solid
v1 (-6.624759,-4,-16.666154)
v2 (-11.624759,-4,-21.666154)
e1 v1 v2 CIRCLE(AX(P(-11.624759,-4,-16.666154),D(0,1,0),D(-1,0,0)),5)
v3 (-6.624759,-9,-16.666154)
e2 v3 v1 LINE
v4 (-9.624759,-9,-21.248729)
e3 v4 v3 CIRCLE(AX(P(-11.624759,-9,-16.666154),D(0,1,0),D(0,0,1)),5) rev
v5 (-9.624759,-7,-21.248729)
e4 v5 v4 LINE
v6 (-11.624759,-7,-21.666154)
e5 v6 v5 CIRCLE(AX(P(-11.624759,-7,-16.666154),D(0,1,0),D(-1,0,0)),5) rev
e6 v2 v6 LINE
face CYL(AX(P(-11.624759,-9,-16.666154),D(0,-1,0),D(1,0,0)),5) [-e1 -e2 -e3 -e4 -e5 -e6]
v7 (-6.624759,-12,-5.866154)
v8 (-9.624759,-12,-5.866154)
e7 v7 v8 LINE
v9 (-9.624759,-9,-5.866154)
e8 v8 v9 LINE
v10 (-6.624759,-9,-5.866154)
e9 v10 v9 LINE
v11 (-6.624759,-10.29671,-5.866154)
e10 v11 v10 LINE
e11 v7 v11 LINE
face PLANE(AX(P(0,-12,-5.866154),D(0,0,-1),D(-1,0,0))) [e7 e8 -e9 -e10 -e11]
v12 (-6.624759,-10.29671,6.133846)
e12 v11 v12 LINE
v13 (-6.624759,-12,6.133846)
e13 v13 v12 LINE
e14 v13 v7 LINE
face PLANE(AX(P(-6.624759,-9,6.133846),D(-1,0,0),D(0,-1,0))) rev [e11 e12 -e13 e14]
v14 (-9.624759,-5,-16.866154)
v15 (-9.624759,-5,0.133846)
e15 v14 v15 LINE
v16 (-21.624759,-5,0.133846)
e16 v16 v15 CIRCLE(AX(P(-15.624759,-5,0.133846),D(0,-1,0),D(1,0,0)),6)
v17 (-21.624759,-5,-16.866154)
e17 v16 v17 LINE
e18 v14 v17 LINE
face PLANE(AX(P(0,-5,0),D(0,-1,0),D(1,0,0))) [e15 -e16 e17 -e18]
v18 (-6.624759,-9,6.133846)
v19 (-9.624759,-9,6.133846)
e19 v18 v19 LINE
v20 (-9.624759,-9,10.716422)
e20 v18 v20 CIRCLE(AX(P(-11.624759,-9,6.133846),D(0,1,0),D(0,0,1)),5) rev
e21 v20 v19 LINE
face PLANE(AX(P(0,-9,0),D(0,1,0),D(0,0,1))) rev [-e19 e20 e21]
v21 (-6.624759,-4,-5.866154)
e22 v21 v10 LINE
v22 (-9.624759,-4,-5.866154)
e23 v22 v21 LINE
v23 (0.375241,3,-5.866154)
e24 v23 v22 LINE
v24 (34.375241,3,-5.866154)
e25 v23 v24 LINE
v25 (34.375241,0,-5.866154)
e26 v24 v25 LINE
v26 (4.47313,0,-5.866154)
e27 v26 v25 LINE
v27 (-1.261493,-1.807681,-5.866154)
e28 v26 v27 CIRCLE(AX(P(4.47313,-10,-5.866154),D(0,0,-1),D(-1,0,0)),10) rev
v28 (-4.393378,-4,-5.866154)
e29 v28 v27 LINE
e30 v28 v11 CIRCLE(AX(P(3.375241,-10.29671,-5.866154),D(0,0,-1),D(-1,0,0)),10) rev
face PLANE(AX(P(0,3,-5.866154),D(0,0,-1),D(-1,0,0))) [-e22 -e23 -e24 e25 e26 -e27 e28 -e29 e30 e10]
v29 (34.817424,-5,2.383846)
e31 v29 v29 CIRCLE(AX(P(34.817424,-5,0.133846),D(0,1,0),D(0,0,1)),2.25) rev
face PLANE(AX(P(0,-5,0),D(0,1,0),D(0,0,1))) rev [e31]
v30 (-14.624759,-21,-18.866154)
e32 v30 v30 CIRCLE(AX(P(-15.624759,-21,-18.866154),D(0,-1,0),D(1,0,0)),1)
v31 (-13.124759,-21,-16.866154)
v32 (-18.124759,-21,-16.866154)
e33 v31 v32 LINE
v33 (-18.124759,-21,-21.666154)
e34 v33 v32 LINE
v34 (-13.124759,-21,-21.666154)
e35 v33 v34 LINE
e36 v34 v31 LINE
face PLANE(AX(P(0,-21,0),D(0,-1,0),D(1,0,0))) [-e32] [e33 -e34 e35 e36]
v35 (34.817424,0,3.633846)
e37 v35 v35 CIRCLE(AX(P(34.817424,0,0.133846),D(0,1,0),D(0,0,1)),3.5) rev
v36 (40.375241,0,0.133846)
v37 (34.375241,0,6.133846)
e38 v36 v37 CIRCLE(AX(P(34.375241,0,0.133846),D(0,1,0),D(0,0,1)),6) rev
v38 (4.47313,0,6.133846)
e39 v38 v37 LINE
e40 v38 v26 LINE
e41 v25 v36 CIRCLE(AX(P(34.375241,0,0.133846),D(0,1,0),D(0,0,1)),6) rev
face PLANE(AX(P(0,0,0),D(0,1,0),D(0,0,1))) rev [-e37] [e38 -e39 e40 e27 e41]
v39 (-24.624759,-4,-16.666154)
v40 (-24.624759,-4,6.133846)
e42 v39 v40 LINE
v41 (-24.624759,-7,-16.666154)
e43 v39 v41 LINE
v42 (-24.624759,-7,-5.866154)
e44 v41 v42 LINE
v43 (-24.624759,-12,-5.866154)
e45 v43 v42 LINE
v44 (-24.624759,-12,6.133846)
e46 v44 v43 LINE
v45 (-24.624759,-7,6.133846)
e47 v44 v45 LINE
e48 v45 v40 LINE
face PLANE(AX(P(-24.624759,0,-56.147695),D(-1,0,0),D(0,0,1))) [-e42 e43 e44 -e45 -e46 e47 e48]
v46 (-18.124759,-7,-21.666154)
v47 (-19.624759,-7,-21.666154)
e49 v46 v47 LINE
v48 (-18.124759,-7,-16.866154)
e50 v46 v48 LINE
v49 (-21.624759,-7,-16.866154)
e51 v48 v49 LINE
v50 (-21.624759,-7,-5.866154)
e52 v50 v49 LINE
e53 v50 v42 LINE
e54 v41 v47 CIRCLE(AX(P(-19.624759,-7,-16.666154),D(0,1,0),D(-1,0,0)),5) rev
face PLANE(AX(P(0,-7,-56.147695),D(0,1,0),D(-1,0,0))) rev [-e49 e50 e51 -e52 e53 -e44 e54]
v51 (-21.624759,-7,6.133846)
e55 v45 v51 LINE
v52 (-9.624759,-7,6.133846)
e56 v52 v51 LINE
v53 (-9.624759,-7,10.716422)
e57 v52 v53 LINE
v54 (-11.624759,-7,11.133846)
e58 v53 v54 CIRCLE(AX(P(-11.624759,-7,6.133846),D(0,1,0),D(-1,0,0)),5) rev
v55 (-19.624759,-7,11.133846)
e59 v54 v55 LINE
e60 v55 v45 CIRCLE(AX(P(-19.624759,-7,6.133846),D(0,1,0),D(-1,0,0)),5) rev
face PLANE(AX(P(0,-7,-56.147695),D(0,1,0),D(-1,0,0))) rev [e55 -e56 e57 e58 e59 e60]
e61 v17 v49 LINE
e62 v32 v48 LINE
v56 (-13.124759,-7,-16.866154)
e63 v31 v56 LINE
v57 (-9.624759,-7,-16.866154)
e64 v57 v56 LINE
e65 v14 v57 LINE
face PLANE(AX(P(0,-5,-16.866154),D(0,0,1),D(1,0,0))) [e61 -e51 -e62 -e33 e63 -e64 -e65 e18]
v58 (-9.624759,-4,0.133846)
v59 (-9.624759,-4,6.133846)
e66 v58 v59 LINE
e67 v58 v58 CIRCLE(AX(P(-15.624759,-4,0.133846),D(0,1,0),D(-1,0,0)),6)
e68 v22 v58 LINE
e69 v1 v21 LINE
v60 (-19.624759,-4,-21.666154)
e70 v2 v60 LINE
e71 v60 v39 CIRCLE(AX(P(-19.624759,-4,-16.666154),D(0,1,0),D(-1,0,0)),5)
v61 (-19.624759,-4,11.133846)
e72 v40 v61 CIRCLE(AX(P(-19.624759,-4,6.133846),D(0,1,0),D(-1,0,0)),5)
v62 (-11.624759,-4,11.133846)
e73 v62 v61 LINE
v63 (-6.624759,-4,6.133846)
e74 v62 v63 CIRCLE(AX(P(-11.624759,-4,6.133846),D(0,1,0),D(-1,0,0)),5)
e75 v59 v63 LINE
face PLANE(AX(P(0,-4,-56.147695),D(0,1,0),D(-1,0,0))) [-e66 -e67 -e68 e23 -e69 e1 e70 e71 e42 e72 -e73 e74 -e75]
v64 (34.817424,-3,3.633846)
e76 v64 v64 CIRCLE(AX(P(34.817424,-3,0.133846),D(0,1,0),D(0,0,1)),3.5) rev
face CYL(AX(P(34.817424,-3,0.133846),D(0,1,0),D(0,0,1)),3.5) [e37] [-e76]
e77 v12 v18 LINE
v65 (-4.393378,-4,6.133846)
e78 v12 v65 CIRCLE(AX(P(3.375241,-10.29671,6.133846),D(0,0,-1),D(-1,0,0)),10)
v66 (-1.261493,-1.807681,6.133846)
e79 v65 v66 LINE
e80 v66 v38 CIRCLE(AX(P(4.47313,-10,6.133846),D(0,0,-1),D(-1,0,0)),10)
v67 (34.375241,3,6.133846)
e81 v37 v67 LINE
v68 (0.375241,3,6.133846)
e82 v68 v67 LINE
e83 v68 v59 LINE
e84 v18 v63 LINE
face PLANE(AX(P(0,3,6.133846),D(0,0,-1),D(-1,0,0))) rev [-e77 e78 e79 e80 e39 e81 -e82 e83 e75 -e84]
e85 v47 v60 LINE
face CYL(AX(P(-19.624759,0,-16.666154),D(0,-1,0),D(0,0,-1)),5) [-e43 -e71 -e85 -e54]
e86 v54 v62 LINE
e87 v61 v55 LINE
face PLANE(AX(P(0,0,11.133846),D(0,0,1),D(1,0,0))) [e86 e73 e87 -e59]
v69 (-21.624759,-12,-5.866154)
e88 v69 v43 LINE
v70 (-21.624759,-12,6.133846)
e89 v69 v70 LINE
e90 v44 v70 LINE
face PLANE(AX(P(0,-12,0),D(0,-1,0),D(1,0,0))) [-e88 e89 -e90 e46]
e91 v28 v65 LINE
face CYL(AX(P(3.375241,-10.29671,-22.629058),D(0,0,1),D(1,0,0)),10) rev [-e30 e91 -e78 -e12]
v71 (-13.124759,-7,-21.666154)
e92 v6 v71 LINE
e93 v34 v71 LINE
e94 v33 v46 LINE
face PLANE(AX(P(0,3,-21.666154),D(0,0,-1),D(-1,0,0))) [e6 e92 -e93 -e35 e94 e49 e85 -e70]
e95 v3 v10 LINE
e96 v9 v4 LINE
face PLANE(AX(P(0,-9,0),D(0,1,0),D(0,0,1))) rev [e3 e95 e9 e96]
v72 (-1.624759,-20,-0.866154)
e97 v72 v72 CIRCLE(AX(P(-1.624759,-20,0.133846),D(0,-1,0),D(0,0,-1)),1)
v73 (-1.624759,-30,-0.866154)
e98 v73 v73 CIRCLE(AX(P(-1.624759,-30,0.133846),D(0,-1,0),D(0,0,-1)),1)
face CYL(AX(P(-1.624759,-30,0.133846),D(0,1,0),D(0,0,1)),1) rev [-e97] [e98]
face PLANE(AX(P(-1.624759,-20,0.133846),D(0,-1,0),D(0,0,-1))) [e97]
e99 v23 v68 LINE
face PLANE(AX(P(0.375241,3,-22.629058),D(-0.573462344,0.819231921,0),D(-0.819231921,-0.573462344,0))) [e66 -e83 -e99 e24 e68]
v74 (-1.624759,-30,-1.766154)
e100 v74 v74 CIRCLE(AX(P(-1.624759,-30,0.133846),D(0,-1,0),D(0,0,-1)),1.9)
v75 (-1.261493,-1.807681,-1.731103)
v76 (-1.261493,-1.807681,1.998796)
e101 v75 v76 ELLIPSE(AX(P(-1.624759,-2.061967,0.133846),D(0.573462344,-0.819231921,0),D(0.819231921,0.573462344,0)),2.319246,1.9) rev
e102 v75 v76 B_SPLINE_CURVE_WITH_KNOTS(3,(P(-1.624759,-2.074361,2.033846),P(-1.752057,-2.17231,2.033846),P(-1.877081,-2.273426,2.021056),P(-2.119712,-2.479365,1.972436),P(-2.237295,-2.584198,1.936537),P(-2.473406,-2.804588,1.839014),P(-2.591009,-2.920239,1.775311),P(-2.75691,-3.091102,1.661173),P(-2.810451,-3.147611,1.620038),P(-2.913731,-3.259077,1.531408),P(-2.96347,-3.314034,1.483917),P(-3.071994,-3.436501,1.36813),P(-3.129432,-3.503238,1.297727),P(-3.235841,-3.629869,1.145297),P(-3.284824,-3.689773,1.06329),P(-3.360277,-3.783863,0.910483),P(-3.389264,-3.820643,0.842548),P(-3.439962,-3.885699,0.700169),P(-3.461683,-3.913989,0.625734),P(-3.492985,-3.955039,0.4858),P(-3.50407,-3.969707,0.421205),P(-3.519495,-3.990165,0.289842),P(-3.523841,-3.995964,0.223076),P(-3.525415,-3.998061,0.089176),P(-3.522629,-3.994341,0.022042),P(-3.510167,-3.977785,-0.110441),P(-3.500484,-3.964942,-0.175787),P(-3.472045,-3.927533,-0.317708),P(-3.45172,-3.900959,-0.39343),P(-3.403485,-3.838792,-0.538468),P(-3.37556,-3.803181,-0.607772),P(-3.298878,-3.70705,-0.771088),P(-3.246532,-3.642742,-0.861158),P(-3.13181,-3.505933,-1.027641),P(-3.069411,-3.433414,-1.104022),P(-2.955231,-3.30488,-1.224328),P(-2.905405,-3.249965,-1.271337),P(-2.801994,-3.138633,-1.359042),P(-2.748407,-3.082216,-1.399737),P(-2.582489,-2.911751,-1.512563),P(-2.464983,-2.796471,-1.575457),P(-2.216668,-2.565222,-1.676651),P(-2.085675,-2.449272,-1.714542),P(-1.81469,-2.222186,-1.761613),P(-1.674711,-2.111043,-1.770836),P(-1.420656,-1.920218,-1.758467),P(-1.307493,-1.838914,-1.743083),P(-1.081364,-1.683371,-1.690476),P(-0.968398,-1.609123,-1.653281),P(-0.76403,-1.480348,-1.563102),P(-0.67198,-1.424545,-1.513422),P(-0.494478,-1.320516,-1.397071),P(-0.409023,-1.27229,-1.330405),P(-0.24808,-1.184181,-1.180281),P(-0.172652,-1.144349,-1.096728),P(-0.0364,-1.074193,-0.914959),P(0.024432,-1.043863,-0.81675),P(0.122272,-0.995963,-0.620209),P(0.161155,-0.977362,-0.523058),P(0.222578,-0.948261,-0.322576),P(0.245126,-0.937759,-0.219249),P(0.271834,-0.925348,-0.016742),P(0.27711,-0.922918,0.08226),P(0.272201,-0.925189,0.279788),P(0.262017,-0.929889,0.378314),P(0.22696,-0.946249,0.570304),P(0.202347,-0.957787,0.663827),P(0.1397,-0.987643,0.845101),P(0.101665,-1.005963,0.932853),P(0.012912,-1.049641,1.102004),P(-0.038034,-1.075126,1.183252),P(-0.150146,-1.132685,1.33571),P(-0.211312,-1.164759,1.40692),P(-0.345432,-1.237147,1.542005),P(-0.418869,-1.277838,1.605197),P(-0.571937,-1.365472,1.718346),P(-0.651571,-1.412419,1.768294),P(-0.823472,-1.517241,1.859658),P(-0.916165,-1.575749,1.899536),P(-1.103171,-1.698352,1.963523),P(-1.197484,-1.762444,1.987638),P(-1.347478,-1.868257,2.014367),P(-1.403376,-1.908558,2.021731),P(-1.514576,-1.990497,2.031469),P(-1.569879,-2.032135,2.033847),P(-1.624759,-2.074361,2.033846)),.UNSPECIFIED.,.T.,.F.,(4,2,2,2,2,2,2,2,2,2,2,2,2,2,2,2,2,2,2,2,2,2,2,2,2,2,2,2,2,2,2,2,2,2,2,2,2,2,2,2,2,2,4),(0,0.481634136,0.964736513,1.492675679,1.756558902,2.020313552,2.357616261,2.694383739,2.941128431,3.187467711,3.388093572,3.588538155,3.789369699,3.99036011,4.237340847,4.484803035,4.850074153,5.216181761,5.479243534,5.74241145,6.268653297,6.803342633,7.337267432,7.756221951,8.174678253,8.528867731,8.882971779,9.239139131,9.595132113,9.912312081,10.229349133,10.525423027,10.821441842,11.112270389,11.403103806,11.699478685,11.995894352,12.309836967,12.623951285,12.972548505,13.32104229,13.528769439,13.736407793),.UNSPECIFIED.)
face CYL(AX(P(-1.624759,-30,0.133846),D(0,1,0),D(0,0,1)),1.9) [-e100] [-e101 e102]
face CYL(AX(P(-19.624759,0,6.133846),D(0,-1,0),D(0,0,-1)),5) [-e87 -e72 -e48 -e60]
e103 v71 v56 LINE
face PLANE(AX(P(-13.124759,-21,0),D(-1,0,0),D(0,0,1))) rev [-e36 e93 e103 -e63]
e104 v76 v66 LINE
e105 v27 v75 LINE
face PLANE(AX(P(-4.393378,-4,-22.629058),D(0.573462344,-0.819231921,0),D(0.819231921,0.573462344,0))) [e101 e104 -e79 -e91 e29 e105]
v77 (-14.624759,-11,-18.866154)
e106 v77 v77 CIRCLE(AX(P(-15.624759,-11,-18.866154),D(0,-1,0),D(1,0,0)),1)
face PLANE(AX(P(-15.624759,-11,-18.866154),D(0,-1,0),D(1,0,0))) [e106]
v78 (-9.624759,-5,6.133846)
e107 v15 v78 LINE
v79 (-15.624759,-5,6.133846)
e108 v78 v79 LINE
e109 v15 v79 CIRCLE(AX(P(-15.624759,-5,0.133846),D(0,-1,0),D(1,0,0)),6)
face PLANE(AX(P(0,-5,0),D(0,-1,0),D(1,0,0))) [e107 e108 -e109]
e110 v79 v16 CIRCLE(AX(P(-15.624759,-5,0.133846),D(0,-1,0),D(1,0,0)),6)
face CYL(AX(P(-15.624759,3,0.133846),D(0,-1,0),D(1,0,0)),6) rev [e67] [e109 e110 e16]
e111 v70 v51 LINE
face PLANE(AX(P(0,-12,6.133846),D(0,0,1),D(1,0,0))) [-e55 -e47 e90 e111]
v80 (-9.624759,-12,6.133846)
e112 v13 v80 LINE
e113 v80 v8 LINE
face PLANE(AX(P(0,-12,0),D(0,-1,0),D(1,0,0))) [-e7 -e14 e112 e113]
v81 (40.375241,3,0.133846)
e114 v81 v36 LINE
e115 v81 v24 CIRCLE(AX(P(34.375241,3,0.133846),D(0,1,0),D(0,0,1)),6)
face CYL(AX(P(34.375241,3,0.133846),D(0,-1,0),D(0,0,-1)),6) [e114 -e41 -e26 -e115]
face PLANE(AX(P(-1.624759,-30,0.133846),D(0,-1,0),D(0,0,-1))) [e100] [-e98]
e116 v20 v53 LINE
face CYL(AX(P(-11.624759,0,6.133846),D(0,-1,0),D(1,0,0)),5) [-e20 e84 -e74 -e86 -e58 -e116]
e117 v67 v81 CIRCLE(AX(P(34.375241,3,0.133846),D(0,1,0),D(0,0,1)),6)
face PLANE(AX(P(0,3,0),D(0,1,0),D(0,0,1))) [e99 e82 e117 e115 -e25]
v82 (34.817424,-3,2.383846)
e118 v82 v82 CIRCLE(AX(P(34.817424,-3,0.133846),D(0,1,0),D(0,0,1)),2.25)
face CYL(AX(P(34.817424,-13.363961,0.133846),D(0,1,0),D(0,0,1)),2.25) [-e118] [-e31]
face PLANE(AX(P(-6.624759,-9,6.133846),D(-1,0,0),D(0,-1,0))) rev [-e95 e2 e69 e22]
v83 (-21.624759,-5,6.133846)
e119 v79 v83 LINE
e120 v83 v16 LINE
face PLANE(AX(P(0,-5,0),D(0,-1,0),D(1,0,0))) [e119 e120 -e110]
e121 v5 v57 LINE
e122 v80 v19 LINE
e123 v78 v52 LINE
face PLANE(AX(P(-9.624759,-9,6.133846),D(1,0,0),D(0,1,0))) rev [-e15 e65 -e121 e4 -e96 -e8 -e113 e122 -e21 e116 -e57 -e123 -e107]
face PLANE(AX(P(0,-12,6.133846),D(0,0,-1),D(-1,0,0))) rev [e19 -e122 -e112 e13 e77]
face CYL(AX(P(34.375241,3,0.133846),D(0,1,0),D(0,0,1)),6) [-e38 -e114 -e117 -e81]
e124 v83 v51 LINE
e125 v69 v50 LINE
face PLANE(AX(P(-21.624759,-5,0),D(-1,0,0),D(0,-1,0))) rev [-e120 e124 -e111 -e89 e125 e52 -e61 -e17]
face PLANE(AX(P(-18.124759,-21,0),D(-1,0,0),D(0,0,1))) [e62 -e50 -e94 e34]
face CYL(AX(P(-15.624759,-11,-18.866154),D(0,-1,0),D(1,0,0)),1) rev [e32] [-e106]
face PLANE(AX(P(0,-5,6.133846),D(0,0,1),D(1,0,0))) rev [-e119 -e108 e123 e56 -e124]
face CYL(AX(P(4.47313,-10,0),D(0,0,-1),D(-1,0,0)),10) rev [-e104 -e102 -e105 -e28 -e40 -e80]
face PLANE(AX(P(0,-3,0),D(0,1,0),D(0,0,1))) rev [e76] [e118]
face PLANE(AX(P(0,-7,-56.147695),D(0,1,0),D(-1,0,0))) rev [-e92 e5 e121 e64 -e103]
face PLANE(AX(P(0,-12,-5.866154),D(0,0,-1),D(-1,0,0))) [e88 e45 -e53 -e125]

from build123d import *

# Parameters (mm, degrees)
SKETCH1_W            = 40
SKETCH1_H            = 12
BOSS_EXTRUDE1_DEPTH  = 3
SKETCH1_7_R          = 3.5
BOSS_EXTRUDE2_DEPTH  = 3
BOSS_EXTRUDE4_DEPTH  = 12
SKETCH4_W            = 3
SKETCH4_H            = 12
BOSS_EXTRUDE5_DEPTH  = 5
FILLET3_R            = 10
BOSS_EXTRUDE11_START = -27.8
BOSS_EXTRUDE11_DEPTH = 32.8
CUT_EXTRUDE2_DEPTH   = 47.899705007
FILLET7_R            = 6
BOSS_EXTRUDE12_DEPTH = 5
CUT_EXTRUDE3_START   = -2
CUT_EXTRUDE3_DEPTH   = 2
SKETCH13_W           = 3
SKETCH13_H           = 12
BOSS_EXTRUDE13_DEPTH = 5
SKETCH13_3_W         = 5
SKETCH13_3_H         = 4.8
BOSS_EXTRUDE14_DEPTH = 14
SKETCH14_R           = 1
CUT_EXTRUDE4_DEPTH   = 10
FILLET8_R            = 10
FILLET9_R            = 5
SKETCH15_R           = 1.9
SKETCH15_R_2         = 1
BOSS_EXTRUDE15_DEPTH = 30
SKETCH15_2_R         = 1
BOSS_EXTRUDE16_DEPTH = 20


# Read off the part's stored shape, not the designer's step: Boss-Extrude11, Cut-Extrude3
# Some blends are built 0.0001 mm under size
with BuildPart() as part:
    # Sketch1 → Boss-Extrude1 (new body)
    with BuildSketch(Plane(origin=(0, 0, 0), x_dir=(1, 0, 0), z_dir=(0, 1, 0))):
        with Locations((20.375241408, -0.133846421)):
            Rectangle(SKETCH1_W, SKETCH1_H)
    extrude(amount=BOSS_EXTRUDE1_DEPTH)

    # Sketch1<7> → Boss-Extrude2 (add)
    with BuildSketch(Plane(origin=(0, 0, 0), x_dir=(1, 0, 0), z_dir=(0, 1, 0))):
        with Locations(Location((34.817424324, -0.133846421, 0), (0, 0, 270))):
            Circle(SKETCH1_7_R)
    extrude(amount=-BOSS_EXTRUDE2_DEPTH)

    # Sketch3 → Boss-Extrude4 (add)
    with BuildSketch(Plane.XY.offset(6.133846421)):
        Polygon((0.375241408, 3), (-9.624758592, -4), (-4.393377613, -4), (5.606622387, 3), align=None)
    extrude(amount=-BOSS_EXTRUDE4_DEPTH)

    # Sketch4 → Boss-Extrude5 (add)
    with BuildSketch(Plane(origin=(0, -4, 0), x_dir=(-1, 0, 0), z_dir=(0, -1, 0))):
        with Locations((8.124758592, -0.133846421)):
            Rectangle(SKETCH4_W, SKETCH4_H)
    extrude(amount=BOSS_EXTRUDE5_DEPTH)

    # Fillet3
    fillet3_edges = [part.edges().sort_by_distance(p)[0] for p in [
        (1.320908101, 0, 0.133846421),
    ]]
    fillet(fillet3_edges, radius=FILLET3_R)

    # Boss-Extrude11 outline → Boss-Extrude11 (add)
    with BuildSketch(Plane.XY.offset(6.133846421).offset(BOSS_EXTRUDE11_START)):
        Polygon((-9.624758592, -7), (-9.624758592, -9), (-6.624758592, -9), (-6.624758592, -4), (-24.624758592, -4), (-24.624758592, -7), align=None)
    extrude(amount=BOSS_EXTRUDE11_DEPTH)

    # Sketch12 → Cut-Extrude2 (cut, through all)
    with BuildSketch(Plane(origin=(0, -7, 0), x_dir=(-1, 0, 0), z_dir=(0, -1, 0))):
        with BuildLine():
            ThreePointArc((9.624758592, -0.133846421), (11.382117904, -4.376487108), (15.624758592, -6.133846421))
            Line((15.624758592, -6.133846421), (15.624758592, 5.866153579))
            ThreePointArc((15.624758592, 5.866153579), (11.382117904, 4.108794266), (9.624758592, -0.133846421))
        make_face()
        with BuildLine():
            Line((15.624758592, 5.866153579), (15.624758592, -6.133846421))
            ThreePointArc((15.624758592, -6.133846421), (19.867399279, -4.376487108), (21.624758592, -0.133846421))
            ThreePointArc((21.624758592, -0.133846421), (19.867399279, 4.108794266), (15.624758592, 5.866153579))
        make_face()
    extrude(amount=-CUT_EXTRUDE2_DEPTH, mode=Mode.SUBTRACT)

    # Fillet7
    fillet7_edges = [part.edges().sort_by_distance(p)[0] for p in [
        (40.375241408, 1.5, -5.866153579),
        (40.375241408, 1.5, 6.133846421),
    ]]
    fillet(fillet7_edges, radius=FILLET7_R - 0.0001)  # a hair under: the kernel refuses the full size

    # Sketch1<9> → Boss-Extrude12 (add)
    with BuildSketch(Plane(origin=(0, 0, 0), x_dir=(1, 0, 0), z_dir=(0, 1, 0))):
        with BuildLine():
            ThreePointArc((32.567424324, -0.133846421), (34.817424324, -2.383846421), (37.067424324, -0.133846421))
            Line((37.067424324, -0.133846421), (32.567424324, -0.133846421))
        make_face()
        with BuildLine():
            Line((32.567424324, -0.133846421), (37.067424324, -0.133846421))
            ThreePointArc((37.067424324, -0.133846421), (34.817424324, 2.116153579), (32.567424324, -0.133846421))
        make_face()
    extrude(amount=-BOSS_EXTRUDE12_DEPTH)

    # Cut-Extrude3 outline → Cut-Extrude3 (cut)
    with BuildSketch(Plane(origin=(0, -7, 0), x_dir=(-1, 0, 0), z_dir=(0, -1, 0)).offset(CUT_EXTRUDE3_START)):
        with BuildLine():
            Line((21.624758592, 16.866153579), (9.624758592, 16.866153579))
            Line((9.624758592, 16.866153579), (9.624758592, -0.133846426))
            ThreePointArc((9.624758592, -0.133846426), (15.624758589, 5.866153579), (21.624758592, -0.133846421))
            Line((21.624758592, -0.133846421), (21.624758592, 16.866153579))
        make_face()
        with BuildLine():
            ThreePointArc((15.624758592, -6.133846421), (11.382117907, -4.37648711), (9.624758592, -0.133846426))
            Line((9.624758592, -0.133846426), (9.624758592, -6.133846421))
            Line((9.624758592, -6.133846421), (15.624758592, -6.133846421))
        make_face()
        with BuildLine():
            Line((21.624758592, -6.133846421), (21.624758592, -0.133846421))
            ThreePointArc((21.624758592, -0.133846421), (19.867399279, -4.376487108), (15.624758592, -6.133846421))
            Line((15.624758592, -6.133846421), (21.624758592, -6.133846421))
        make_face()
    extrude(amount=CUT_EXTRUDE3_DEPTH, mode=Mode.SUBTRACT)

    # Sketch13 → Boss-Extrude13 (add)
    with BuildSketch(Plane(origin=(0, -7, 0), x_dir=(-1, 0, 0), z_dir=(0, -1, 0))):
        with Locations((8.124758592, -0.133846421)):
            Rectangle(SKETCH13_W, SKETCH13_H)
        with Locations((23.124758592, -0.133846421)):
            Rectangle(SKETCH13_W, SKETCH13_H)
    extrude(amount=BOSS_EXTRUDE13_DEPTH)

    # Sketch13<3> → Boss-Extrude14 (add)
    with BuildSketch(Plane(origin=(0, -7, 0), x_dir=(-1, 0, 0), z_dir=(0, -1, 0))):
        with Locations((15.624758592, 19.266153579)):
            Rectangle(SKETCH13_3_W, SKETCH13_3_H)
    extrude(amount=BOSS_EXTRUDE14_DEPTH)

    # Sketch14 → Cut-Extrude4 (cut)
    with BuildSketch(Plane.XZ.offset(21)):
        with Locations((-15.624758592, -18.866153579)):
            Circle(SKETCH14_R)
        with Locations((-15.624758592, 8.133846421)):
            Circle(SKETCH14_R)
    extrude(amount=-CUT_EXTRUDE4_DEPTH, mode=Mode.SUBTRACT)

    # Fillet8
    # the kernel refuses this fillet: 10 mm, written as the material it adds along each edge
    with BuildSketch(Plane(origin=(-6.624758592, -4, -5.866153579), x_dir=(1, 0, 0), z_dir=(0, 0, 1))) as fillet8_piece_1:
        with BuildLine():
            CenterArc((10, -6.296710133), FILLET8_R, 140.974145336, 39.025854664)
            Line((0, -6.296710133), (0, 0))
            Line((0, 0), (2.231380978, 0))
        make_face()
    extrude(amount=12)

    # Fillet9
    fillet9_edges = [part.edges().sort_by_distance(p)[0] for p in [
        (-24.624758592, -5.5, -21.666153579),
        (-6.624758592, -6.5, -21.666153579),
        (-6.624758592, -6.5, 11.133846421),
        (-24.624758592, -5.5, 11.133846421),
    ]]
    fillet(fillet9_edges, radius=FILLET9_R - 0.0001)  # a hair under: the kernel refuses the full size

    # Sketch15 → Boss-Extrude15 (add)
    with BuildSketch(Plane(origin=(0, 0, 0), x_dir=(-1, 0, 0), z_dir=(0, -1, 0))):
        with Locations(Location((1.624758592, -0.133846421, 0), (0, 0, 258.977606014))):
            Circle(SKETCH15_R)
        with Locations(Location((1.624758592, -0.133846421, 0), (0, 0, 248.699103744))):
            Circle(SKETCH15_R_2, mode=Mode.SUBTRACT)
    extrude(amount=BOSS_EXTRUDE15_DEPTH)

    # Sketch15<2> → Boss-Extrude16 (add)
    with BuildSketch(Plane(origin=(0, 0, 0), x_dir=(-1, 0, 0), z_dir=(0, -1, 0))):
        with Locations(Location((1.624758592, -0.133846421, 0), (0, 0, 90))):
            Circle(SKETCH15_2_R)
    extrude(amount=BOSS_EXTRUDE16_DEPTH)


solid = part.part
